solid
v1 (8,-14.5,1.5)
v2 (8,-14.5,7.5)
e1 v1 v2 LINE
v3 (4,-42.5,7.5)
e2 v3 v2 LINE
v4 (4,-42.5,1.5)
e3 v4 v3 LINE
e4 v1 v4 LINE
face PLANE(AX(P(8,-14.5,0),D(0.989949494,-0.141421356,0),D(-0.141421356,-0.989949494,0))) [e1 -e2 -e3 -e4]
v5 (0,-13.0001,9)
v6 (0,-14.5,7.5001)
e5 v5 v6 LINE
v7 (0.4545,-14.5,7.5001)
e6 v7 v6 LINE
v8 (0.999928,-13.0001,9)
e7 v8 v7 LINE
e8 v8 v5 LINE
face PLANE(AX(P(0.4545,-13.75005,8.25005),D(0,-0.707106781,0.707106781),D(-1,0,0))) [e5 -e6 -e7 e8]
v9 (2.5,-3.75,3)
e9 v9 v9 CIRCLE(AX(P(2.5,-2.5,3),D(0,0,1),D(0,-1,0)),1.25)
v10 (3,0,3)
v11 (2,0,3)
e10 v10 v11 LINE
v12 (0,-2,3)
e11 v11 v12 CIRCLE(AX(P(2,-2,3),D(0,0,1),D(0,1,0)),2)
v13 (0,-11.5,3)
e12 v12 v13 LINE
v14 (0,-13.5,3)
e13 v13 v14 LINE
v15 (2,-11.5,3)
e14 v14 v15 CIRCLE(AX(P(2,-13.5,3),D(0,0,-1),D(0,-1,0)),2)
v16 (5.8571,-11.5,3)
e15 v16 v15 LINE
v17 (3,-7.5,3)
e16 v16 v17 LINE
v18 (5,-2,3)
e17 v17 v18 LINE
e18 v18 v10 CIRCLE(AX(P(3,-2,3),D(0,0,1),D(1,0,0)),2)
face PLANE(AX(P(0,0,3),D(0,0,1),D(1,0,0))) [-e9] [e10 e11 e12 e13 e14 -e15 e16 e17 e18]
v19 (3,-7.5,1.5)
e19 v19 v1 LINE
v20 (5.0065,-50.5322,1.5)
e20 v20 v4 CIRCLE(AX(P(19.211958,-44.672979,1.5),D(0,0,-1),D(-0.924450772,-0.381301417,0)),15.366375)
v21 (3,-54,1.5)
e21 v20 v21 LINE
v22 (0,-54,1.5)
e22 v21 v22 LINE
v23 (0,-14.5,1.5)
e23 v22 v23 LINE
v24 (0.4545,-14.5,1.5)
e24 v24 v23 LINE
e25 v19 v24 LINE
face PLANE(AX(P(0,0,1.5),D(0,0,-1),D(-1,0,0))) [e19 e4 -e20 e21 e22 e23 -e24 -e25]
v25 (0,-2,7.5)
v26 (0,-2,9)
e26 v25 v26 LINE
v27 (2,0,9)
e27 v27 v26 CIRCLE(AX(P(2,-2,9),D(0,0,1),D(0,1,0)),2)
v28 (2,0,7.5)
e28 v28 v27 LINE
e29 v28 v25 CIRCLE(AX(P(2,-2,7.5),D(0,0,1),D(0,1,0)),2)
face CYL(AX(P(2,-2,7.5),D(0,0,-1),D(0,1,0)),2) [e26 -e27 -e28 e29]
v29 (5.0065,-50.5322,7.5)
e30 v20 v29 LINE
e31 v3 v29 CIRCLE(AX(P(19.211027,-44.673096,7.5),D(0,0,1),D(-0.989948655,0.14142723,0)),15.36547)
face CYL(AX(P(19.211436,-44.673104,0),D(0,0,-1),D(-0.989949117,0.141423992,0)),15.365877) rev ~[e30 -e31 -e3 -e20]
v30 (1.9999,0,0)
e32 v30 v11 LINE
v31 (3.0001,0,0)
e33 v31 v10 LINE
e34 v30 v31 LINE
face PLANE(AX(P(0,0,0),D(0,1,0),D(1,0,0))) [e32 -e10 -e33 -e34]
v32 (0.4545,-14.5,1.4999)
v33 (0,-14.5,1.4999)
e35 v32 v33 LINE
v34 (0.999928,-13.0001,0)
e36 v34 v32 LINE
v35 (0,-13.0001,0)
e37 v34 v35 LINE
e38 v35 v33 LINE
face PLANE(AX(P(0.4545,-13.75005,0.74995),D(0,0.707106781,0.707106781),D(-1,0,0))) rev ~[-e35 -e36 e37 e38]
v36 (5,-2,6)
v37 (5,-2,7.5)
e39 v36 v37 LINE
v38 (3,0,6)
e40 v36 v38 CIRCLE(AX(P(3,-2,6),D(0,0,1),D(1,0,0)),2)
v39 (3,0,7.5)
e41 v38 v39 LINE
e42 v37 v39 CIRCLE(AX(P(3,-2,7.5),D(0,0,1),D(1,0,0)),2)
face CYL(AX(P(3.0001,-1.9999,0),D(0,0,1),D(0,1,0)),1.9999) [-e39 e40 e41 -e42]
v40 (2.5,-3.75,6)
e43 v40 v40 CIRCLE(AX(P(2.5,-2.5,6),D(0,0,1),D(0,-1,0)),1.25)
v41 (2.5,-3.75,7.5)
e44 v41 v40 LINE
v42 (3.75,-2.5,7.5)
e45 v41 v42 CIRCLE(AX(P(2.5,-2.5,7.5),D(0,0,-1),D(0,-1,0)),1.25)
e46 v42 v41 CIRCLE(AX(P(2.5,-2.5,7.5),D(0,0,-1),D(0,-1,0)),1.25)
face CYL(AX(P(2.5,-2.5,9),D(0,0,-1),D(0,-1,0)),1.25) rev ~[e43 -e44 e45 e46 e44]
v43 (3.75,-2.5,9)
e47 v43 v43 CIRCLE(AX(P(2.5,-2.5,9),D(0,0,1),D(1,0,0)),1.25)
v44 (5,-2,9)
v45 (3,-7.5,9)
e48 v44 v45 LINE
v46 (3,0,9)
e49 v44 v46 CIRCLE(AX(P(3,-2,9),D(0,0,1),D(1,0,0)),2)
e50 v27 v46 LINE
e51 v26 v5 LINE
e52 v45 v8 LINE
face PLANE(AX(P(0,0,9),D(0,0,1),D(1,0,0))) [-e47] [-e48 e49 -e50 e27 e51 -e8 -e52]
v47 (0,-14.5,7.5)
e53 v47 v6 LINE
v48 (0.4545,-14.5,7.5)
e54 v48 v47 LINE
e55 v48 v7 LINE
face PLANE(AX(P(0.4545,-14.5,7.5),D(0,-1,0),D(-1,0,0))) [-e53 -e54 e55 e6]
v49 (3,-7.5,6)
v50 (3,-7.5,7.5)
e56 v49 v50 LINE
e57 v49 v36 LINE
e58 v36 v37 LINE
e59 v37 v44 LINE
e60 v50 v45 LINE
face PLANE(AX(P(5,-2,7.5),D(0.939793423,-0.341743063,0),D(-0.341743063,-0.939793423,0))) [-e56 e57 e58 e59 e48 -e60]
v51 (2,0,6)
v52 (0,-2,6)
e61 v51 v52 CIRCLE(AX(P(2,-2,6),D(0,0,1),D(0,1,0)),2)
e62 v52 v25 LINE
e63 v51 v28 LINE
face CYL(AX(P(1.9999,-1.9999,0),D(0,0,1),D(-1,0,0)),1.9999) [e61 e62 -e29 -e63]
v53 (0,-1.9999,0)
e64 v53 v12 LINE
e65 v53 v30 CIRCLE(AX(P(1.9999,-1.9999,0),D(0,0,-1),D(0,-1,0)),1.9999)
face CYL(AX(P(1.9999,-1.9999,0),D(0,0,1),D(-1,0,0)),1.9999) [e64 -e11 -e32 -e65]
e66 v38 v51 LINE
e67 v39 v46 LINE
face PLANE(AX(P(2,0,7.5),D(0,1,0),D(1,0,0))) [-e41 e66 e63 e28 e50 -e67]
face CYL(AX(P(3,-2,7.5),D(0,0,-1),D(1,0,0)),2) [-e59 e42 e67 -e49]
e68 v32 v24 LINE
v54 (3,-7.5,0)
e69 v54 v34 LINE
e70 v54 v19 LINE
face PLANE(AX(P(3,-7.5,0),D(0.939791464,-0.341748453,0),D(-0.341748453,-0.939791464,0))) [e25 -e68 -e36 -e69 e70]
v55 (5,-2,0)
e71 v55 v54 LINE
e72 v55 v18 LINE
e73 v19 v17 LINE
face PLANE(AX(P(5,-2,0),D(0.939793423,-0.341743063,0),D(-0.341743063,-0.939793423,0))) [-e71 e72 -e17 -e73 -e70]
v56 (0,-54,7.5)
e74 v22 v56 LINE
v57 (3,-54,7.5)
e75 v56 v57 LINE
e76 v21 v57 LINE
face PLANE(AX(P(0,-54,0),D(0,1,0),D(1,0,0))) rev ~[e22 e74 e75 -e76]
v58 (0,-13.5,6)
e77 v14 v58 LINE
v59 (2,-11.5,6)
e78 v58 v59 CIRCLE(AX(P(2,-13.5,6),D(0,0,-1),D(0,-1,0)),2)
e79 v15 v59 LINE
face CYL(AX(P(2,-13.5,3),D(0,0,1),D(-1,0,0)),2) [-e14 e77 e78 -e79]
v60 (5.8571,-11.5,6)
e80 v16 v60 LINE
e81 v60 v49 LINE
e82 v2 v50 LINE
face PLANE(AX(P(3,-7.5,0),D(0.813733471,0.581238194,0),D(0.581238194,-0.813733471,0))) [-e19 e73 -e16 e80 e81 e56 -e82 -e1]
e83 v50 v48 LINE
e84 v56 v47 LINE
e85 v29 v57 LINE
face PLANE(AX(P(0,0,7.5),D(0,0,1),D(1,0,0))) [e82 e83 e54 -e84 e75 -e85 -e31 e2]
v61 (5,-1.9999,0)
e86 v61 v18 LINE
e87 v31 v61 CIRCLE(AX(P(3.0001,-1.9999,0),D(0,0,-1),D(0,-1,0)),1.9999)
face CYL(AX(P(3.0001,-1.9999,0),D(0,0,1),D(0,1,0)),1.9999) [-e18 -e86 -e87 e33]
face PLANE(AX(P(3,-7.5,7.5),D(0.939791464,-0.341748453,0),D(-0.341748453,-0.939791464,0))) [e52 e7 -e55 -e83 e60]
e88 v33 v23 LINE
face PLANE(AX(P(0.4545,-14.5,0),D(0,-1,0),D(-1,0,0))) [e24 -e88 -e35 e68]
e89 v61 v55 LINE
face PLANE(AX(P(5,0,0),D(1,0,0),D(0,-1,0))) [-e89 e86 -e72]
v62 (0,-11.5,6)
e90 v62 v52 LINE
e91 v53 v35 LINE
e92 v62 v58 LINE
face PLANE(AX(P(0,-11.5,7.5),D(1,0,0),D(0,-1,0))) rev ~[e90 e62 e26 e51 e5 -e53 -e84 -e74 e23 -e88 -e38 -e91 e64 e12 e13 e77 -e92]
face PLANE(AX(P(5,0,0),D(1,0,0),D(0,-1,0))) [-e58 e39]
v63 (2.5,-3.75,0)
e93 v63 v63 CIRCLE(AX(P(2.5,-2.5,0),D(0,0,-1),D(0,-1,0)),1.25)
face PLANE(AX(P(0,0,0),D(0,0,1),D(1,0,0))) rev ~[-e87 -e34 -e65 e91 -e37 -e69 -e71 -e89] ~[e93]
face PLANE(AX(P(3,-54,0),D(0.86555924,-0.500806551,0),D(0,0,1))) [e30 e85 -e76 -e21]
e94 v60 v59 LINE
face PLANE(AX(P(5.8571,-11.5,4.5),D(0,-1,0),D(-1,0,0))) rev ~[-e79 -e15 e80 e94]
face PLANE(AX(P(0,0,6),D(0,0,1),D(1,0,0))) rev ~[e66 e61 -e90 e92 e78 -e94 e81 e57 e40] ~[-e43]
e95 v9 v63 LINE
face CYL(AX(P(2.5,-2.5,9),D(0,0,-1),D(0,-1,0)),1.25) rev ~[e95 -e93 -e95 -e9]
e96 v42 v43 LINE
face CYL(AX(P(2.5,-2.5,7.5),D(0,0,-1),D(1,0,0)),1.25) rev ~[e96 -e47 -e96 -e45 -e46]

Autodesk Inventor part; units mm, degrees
ref_plane "YZ Plane" through (0, 0, 0) normal (1, 0, 0) x (0, 1, 0)
ref_plane "XZ Plane" through (0, 0, 0) normal (0, 1, 0) x (-1, 0, 0)
sketch "Base" plane through (0, 0, 0) normal (0, 0, 1) x (1, 0, 0)
  line L0 (0, 0) -> (0, -54)
  line L1 (0, 0) -> (5, 0)
  line L2 (5, 0) -> (5, -2)
  line L3 (3, -7.5) -> (8, -14.5)
  line L4 (8, -14.5) -> (4, -42.5)
  arc A0 (4, -42.5) -> (7, -54) centre (19.2115, -44.6731) ccw
  line L5 (0, -54) -> (7, -54)
  line L6 (5, -2) -> (3, -7.5)
  dimension "d0" = 54
  dimension "d1" = 5
  dimension "d6" = 28
  dimension "d10" = 4
  dimension "d51" = 3
  dimension "d52" = 8
  dimension "d53" = 5.5
  dimension "d54" = 2
  dimension "d55" = 7
  dimension "d112" = 7
extrude "BaseFeature" add sketch "Base" along normal blind 9
chamfer "EndChamferFeature" distance 4 angle 45 1 edges at (7, -54, 4.5)
sketch "MountHole" plane through (0, 0, 9) normal (0, 0, 1) x (1, 0, 0)
  circle A0 centre (2.5, -2.5) radius 1.25
  line L0 (5, 0) -> (0, 0) construction
  line L1 (0, 0) -> (0, -54) construction
  dimension "d40" = 2.5
  dimension "d41" = 2.5
  dimension "d42" = 2.5
hole "MountHoleFeature" at (2.5, -2.5, 9) direction (0, 0, -1) diameter 2.5 end through all
fillet "EndFilletsFeature" radius 2 2 edges at (0, 0, 4.5) (5, 0, 4.5)
ref_plane "MidPlane" through (0, 0, 4.5) normal (0, 0, 1) x (1, 0, 0)
sketch "MountCut" plane through (0, 0, 4.5) normal (0, 0, 1) x (1, 0, 0)
  line L0 (5.0065, -50.5322) -> (3, -54) projected
  arc A0 (4, -42.5) -> (5.0065, -50.5322) centre (19.2115, -44.6731) ccw projected
  line L1 (4, -42.5) -> (8, -14.5) projected
  line L2 (8, -14.5) -> (3, -7.5) projected
  line L3 (3, -7.5) -> (5, -2) projected
  arc A1 (5, -2) -> (3, 0) centre (3, -2) ccw projected
  line L4 (3, 0) -> (2, 0) projected
  arc A2 (2, 0) -> (0, -2) centre (2, -2) ccw projected
  line L5 (0, -2) -> (0, -54) projected
  circle A3 centre (2.5, -2.5) radius 1.25 projected
  line L6 (3, -7.5) -> (0, -7.5)
  line L7 (8, -14.5) -> (3, -7.5) projected
  line L8 (5.8571, -11.5) -> (0, -11.5)
  line L9 (0, -2) -> (0, -54) projected
  line L10 (0, -54) -> (3, -54) projected
  point P0 (0, -39.1407)
  dimension "d81" = 4
extrude "MountCutFeature" cut sketch "MountCut" along normal mid plane 3 contours L5 L6 L2 L8 | L5 A2 L4 A1 L3 L6
sketch "LeftTrim" plane through (0, 0, 9) normal (0, 0, 1) x (1, 0, 0)
  line L0 (5.0065, -50.5322) -> (3, -54) projected
  arc A0 (4, -42.5) -> (5.0065, -50.5322) centre (19.2115, -44.6731) ccw projected
  line L1 (4, -42.5) -> (8, -14.5) projected
  line L2 (8, -14.5) -> (3, -7.5) projected
  line L3 (3, -7.5) -> (5, -2) projected
  arc A1 (5, -2) -> (3, 0) centre (3, -2) ccw projected
  line L4 (3, 0) -> (2, 0) projected
  arc A2 (2, 0) -> (0, -2) centre (2, -2) ccw projected
  line L5 (0, -2) -> (0, -54) projected
  circle A3 centre (2.5, -2.5) radius 1.25 projected
  line L6 (3, -7.5) -> (-0.5, -7.5)
  line L7 (0, -54) -> (3, -54) projected
extrude "LeftTrimFeature" cut sketch "LeftTrim" against normal blind 1.5 contours L0 L7 L5 L6 L2 L1 A0 | L5 A2 L4 A1 L3 L6 | A3
sketch "LeftReinforce" plane through (0, 0, 7.5) normal (0, 0, 1) x (1, 0, 0)
  circle A0 centre (2.5, -2.5) radius 1.25 projected
  line L0 (0, -11.5) -> (0, -2) construction
  line L1 (5.8571, -11.5) -> (0, -11.5) construction
  line L2 (3, -7.5) -> (5.8571, -11.5) construction
  line L3 (5, -2) -> (3, -7.5) projected
  arc A1 (5, -2) -> (3, 0) centre (3, -2) ccw projected
  line L4 (2, 0) -> (3, 0) projected
  arc A2 (2, 0) -> (0, -2) centre (2, -2) ccw projected
  line L5 (0, -11.5) -> (0, -2)
  line L6 (0, -11.5) -> (0, -14.5)
  line L7 (3, -7.5) -> (0.4545, -14.5)
  line L8 (0.4545, -14.5) -> (0, -14.5)
  line L9 (0.4545, -14.5) -> (8, -14.5) construction
extrude "LeftReinforceFeature" add sketch "LeftReinforce" along normal blind 1.5
sketch "RightTrim" plane through (0, 0, 0) normal (0, 0, -1) x (-1, 0, 0)
  line L0 (0, -54) -> (0, -14.5) projected
  line L1 (-5.0065, -50.5322) -> (-3, -54) projected
  arc A0 (-5.0065, -50.5322) -> (-4, -42.5) centre (-19.2115, -44.6731) ccw projected
  line L2 (-8, -14.5) -> (-4, -42.5) projected
  line L3 (-3, -7.5) -> (-8, -14.5) projected
  line L4 (-3, -7.5) -> (-0.4545, -14.5) projected
  line L5 (-0.4545, -14.5) -> (0, -14.5) projected
  line L6 (-3, -54) -> (0, -54) projected
extrude "RightTrimFeature" cut sketch "RightTrim" against normal blind 1.5
chamfer "MountSideChamfersFeature" distance 1.5 angle 45 2 edges at (0.2273, -14.5, 9) (0.2273, -14.5, 0)
fillet "MiddleCutBottomFilletFeature" radius 2 1 edges at (0, -11.5, 4.5)
properties part number "ProximalPhalangeIndex2"
